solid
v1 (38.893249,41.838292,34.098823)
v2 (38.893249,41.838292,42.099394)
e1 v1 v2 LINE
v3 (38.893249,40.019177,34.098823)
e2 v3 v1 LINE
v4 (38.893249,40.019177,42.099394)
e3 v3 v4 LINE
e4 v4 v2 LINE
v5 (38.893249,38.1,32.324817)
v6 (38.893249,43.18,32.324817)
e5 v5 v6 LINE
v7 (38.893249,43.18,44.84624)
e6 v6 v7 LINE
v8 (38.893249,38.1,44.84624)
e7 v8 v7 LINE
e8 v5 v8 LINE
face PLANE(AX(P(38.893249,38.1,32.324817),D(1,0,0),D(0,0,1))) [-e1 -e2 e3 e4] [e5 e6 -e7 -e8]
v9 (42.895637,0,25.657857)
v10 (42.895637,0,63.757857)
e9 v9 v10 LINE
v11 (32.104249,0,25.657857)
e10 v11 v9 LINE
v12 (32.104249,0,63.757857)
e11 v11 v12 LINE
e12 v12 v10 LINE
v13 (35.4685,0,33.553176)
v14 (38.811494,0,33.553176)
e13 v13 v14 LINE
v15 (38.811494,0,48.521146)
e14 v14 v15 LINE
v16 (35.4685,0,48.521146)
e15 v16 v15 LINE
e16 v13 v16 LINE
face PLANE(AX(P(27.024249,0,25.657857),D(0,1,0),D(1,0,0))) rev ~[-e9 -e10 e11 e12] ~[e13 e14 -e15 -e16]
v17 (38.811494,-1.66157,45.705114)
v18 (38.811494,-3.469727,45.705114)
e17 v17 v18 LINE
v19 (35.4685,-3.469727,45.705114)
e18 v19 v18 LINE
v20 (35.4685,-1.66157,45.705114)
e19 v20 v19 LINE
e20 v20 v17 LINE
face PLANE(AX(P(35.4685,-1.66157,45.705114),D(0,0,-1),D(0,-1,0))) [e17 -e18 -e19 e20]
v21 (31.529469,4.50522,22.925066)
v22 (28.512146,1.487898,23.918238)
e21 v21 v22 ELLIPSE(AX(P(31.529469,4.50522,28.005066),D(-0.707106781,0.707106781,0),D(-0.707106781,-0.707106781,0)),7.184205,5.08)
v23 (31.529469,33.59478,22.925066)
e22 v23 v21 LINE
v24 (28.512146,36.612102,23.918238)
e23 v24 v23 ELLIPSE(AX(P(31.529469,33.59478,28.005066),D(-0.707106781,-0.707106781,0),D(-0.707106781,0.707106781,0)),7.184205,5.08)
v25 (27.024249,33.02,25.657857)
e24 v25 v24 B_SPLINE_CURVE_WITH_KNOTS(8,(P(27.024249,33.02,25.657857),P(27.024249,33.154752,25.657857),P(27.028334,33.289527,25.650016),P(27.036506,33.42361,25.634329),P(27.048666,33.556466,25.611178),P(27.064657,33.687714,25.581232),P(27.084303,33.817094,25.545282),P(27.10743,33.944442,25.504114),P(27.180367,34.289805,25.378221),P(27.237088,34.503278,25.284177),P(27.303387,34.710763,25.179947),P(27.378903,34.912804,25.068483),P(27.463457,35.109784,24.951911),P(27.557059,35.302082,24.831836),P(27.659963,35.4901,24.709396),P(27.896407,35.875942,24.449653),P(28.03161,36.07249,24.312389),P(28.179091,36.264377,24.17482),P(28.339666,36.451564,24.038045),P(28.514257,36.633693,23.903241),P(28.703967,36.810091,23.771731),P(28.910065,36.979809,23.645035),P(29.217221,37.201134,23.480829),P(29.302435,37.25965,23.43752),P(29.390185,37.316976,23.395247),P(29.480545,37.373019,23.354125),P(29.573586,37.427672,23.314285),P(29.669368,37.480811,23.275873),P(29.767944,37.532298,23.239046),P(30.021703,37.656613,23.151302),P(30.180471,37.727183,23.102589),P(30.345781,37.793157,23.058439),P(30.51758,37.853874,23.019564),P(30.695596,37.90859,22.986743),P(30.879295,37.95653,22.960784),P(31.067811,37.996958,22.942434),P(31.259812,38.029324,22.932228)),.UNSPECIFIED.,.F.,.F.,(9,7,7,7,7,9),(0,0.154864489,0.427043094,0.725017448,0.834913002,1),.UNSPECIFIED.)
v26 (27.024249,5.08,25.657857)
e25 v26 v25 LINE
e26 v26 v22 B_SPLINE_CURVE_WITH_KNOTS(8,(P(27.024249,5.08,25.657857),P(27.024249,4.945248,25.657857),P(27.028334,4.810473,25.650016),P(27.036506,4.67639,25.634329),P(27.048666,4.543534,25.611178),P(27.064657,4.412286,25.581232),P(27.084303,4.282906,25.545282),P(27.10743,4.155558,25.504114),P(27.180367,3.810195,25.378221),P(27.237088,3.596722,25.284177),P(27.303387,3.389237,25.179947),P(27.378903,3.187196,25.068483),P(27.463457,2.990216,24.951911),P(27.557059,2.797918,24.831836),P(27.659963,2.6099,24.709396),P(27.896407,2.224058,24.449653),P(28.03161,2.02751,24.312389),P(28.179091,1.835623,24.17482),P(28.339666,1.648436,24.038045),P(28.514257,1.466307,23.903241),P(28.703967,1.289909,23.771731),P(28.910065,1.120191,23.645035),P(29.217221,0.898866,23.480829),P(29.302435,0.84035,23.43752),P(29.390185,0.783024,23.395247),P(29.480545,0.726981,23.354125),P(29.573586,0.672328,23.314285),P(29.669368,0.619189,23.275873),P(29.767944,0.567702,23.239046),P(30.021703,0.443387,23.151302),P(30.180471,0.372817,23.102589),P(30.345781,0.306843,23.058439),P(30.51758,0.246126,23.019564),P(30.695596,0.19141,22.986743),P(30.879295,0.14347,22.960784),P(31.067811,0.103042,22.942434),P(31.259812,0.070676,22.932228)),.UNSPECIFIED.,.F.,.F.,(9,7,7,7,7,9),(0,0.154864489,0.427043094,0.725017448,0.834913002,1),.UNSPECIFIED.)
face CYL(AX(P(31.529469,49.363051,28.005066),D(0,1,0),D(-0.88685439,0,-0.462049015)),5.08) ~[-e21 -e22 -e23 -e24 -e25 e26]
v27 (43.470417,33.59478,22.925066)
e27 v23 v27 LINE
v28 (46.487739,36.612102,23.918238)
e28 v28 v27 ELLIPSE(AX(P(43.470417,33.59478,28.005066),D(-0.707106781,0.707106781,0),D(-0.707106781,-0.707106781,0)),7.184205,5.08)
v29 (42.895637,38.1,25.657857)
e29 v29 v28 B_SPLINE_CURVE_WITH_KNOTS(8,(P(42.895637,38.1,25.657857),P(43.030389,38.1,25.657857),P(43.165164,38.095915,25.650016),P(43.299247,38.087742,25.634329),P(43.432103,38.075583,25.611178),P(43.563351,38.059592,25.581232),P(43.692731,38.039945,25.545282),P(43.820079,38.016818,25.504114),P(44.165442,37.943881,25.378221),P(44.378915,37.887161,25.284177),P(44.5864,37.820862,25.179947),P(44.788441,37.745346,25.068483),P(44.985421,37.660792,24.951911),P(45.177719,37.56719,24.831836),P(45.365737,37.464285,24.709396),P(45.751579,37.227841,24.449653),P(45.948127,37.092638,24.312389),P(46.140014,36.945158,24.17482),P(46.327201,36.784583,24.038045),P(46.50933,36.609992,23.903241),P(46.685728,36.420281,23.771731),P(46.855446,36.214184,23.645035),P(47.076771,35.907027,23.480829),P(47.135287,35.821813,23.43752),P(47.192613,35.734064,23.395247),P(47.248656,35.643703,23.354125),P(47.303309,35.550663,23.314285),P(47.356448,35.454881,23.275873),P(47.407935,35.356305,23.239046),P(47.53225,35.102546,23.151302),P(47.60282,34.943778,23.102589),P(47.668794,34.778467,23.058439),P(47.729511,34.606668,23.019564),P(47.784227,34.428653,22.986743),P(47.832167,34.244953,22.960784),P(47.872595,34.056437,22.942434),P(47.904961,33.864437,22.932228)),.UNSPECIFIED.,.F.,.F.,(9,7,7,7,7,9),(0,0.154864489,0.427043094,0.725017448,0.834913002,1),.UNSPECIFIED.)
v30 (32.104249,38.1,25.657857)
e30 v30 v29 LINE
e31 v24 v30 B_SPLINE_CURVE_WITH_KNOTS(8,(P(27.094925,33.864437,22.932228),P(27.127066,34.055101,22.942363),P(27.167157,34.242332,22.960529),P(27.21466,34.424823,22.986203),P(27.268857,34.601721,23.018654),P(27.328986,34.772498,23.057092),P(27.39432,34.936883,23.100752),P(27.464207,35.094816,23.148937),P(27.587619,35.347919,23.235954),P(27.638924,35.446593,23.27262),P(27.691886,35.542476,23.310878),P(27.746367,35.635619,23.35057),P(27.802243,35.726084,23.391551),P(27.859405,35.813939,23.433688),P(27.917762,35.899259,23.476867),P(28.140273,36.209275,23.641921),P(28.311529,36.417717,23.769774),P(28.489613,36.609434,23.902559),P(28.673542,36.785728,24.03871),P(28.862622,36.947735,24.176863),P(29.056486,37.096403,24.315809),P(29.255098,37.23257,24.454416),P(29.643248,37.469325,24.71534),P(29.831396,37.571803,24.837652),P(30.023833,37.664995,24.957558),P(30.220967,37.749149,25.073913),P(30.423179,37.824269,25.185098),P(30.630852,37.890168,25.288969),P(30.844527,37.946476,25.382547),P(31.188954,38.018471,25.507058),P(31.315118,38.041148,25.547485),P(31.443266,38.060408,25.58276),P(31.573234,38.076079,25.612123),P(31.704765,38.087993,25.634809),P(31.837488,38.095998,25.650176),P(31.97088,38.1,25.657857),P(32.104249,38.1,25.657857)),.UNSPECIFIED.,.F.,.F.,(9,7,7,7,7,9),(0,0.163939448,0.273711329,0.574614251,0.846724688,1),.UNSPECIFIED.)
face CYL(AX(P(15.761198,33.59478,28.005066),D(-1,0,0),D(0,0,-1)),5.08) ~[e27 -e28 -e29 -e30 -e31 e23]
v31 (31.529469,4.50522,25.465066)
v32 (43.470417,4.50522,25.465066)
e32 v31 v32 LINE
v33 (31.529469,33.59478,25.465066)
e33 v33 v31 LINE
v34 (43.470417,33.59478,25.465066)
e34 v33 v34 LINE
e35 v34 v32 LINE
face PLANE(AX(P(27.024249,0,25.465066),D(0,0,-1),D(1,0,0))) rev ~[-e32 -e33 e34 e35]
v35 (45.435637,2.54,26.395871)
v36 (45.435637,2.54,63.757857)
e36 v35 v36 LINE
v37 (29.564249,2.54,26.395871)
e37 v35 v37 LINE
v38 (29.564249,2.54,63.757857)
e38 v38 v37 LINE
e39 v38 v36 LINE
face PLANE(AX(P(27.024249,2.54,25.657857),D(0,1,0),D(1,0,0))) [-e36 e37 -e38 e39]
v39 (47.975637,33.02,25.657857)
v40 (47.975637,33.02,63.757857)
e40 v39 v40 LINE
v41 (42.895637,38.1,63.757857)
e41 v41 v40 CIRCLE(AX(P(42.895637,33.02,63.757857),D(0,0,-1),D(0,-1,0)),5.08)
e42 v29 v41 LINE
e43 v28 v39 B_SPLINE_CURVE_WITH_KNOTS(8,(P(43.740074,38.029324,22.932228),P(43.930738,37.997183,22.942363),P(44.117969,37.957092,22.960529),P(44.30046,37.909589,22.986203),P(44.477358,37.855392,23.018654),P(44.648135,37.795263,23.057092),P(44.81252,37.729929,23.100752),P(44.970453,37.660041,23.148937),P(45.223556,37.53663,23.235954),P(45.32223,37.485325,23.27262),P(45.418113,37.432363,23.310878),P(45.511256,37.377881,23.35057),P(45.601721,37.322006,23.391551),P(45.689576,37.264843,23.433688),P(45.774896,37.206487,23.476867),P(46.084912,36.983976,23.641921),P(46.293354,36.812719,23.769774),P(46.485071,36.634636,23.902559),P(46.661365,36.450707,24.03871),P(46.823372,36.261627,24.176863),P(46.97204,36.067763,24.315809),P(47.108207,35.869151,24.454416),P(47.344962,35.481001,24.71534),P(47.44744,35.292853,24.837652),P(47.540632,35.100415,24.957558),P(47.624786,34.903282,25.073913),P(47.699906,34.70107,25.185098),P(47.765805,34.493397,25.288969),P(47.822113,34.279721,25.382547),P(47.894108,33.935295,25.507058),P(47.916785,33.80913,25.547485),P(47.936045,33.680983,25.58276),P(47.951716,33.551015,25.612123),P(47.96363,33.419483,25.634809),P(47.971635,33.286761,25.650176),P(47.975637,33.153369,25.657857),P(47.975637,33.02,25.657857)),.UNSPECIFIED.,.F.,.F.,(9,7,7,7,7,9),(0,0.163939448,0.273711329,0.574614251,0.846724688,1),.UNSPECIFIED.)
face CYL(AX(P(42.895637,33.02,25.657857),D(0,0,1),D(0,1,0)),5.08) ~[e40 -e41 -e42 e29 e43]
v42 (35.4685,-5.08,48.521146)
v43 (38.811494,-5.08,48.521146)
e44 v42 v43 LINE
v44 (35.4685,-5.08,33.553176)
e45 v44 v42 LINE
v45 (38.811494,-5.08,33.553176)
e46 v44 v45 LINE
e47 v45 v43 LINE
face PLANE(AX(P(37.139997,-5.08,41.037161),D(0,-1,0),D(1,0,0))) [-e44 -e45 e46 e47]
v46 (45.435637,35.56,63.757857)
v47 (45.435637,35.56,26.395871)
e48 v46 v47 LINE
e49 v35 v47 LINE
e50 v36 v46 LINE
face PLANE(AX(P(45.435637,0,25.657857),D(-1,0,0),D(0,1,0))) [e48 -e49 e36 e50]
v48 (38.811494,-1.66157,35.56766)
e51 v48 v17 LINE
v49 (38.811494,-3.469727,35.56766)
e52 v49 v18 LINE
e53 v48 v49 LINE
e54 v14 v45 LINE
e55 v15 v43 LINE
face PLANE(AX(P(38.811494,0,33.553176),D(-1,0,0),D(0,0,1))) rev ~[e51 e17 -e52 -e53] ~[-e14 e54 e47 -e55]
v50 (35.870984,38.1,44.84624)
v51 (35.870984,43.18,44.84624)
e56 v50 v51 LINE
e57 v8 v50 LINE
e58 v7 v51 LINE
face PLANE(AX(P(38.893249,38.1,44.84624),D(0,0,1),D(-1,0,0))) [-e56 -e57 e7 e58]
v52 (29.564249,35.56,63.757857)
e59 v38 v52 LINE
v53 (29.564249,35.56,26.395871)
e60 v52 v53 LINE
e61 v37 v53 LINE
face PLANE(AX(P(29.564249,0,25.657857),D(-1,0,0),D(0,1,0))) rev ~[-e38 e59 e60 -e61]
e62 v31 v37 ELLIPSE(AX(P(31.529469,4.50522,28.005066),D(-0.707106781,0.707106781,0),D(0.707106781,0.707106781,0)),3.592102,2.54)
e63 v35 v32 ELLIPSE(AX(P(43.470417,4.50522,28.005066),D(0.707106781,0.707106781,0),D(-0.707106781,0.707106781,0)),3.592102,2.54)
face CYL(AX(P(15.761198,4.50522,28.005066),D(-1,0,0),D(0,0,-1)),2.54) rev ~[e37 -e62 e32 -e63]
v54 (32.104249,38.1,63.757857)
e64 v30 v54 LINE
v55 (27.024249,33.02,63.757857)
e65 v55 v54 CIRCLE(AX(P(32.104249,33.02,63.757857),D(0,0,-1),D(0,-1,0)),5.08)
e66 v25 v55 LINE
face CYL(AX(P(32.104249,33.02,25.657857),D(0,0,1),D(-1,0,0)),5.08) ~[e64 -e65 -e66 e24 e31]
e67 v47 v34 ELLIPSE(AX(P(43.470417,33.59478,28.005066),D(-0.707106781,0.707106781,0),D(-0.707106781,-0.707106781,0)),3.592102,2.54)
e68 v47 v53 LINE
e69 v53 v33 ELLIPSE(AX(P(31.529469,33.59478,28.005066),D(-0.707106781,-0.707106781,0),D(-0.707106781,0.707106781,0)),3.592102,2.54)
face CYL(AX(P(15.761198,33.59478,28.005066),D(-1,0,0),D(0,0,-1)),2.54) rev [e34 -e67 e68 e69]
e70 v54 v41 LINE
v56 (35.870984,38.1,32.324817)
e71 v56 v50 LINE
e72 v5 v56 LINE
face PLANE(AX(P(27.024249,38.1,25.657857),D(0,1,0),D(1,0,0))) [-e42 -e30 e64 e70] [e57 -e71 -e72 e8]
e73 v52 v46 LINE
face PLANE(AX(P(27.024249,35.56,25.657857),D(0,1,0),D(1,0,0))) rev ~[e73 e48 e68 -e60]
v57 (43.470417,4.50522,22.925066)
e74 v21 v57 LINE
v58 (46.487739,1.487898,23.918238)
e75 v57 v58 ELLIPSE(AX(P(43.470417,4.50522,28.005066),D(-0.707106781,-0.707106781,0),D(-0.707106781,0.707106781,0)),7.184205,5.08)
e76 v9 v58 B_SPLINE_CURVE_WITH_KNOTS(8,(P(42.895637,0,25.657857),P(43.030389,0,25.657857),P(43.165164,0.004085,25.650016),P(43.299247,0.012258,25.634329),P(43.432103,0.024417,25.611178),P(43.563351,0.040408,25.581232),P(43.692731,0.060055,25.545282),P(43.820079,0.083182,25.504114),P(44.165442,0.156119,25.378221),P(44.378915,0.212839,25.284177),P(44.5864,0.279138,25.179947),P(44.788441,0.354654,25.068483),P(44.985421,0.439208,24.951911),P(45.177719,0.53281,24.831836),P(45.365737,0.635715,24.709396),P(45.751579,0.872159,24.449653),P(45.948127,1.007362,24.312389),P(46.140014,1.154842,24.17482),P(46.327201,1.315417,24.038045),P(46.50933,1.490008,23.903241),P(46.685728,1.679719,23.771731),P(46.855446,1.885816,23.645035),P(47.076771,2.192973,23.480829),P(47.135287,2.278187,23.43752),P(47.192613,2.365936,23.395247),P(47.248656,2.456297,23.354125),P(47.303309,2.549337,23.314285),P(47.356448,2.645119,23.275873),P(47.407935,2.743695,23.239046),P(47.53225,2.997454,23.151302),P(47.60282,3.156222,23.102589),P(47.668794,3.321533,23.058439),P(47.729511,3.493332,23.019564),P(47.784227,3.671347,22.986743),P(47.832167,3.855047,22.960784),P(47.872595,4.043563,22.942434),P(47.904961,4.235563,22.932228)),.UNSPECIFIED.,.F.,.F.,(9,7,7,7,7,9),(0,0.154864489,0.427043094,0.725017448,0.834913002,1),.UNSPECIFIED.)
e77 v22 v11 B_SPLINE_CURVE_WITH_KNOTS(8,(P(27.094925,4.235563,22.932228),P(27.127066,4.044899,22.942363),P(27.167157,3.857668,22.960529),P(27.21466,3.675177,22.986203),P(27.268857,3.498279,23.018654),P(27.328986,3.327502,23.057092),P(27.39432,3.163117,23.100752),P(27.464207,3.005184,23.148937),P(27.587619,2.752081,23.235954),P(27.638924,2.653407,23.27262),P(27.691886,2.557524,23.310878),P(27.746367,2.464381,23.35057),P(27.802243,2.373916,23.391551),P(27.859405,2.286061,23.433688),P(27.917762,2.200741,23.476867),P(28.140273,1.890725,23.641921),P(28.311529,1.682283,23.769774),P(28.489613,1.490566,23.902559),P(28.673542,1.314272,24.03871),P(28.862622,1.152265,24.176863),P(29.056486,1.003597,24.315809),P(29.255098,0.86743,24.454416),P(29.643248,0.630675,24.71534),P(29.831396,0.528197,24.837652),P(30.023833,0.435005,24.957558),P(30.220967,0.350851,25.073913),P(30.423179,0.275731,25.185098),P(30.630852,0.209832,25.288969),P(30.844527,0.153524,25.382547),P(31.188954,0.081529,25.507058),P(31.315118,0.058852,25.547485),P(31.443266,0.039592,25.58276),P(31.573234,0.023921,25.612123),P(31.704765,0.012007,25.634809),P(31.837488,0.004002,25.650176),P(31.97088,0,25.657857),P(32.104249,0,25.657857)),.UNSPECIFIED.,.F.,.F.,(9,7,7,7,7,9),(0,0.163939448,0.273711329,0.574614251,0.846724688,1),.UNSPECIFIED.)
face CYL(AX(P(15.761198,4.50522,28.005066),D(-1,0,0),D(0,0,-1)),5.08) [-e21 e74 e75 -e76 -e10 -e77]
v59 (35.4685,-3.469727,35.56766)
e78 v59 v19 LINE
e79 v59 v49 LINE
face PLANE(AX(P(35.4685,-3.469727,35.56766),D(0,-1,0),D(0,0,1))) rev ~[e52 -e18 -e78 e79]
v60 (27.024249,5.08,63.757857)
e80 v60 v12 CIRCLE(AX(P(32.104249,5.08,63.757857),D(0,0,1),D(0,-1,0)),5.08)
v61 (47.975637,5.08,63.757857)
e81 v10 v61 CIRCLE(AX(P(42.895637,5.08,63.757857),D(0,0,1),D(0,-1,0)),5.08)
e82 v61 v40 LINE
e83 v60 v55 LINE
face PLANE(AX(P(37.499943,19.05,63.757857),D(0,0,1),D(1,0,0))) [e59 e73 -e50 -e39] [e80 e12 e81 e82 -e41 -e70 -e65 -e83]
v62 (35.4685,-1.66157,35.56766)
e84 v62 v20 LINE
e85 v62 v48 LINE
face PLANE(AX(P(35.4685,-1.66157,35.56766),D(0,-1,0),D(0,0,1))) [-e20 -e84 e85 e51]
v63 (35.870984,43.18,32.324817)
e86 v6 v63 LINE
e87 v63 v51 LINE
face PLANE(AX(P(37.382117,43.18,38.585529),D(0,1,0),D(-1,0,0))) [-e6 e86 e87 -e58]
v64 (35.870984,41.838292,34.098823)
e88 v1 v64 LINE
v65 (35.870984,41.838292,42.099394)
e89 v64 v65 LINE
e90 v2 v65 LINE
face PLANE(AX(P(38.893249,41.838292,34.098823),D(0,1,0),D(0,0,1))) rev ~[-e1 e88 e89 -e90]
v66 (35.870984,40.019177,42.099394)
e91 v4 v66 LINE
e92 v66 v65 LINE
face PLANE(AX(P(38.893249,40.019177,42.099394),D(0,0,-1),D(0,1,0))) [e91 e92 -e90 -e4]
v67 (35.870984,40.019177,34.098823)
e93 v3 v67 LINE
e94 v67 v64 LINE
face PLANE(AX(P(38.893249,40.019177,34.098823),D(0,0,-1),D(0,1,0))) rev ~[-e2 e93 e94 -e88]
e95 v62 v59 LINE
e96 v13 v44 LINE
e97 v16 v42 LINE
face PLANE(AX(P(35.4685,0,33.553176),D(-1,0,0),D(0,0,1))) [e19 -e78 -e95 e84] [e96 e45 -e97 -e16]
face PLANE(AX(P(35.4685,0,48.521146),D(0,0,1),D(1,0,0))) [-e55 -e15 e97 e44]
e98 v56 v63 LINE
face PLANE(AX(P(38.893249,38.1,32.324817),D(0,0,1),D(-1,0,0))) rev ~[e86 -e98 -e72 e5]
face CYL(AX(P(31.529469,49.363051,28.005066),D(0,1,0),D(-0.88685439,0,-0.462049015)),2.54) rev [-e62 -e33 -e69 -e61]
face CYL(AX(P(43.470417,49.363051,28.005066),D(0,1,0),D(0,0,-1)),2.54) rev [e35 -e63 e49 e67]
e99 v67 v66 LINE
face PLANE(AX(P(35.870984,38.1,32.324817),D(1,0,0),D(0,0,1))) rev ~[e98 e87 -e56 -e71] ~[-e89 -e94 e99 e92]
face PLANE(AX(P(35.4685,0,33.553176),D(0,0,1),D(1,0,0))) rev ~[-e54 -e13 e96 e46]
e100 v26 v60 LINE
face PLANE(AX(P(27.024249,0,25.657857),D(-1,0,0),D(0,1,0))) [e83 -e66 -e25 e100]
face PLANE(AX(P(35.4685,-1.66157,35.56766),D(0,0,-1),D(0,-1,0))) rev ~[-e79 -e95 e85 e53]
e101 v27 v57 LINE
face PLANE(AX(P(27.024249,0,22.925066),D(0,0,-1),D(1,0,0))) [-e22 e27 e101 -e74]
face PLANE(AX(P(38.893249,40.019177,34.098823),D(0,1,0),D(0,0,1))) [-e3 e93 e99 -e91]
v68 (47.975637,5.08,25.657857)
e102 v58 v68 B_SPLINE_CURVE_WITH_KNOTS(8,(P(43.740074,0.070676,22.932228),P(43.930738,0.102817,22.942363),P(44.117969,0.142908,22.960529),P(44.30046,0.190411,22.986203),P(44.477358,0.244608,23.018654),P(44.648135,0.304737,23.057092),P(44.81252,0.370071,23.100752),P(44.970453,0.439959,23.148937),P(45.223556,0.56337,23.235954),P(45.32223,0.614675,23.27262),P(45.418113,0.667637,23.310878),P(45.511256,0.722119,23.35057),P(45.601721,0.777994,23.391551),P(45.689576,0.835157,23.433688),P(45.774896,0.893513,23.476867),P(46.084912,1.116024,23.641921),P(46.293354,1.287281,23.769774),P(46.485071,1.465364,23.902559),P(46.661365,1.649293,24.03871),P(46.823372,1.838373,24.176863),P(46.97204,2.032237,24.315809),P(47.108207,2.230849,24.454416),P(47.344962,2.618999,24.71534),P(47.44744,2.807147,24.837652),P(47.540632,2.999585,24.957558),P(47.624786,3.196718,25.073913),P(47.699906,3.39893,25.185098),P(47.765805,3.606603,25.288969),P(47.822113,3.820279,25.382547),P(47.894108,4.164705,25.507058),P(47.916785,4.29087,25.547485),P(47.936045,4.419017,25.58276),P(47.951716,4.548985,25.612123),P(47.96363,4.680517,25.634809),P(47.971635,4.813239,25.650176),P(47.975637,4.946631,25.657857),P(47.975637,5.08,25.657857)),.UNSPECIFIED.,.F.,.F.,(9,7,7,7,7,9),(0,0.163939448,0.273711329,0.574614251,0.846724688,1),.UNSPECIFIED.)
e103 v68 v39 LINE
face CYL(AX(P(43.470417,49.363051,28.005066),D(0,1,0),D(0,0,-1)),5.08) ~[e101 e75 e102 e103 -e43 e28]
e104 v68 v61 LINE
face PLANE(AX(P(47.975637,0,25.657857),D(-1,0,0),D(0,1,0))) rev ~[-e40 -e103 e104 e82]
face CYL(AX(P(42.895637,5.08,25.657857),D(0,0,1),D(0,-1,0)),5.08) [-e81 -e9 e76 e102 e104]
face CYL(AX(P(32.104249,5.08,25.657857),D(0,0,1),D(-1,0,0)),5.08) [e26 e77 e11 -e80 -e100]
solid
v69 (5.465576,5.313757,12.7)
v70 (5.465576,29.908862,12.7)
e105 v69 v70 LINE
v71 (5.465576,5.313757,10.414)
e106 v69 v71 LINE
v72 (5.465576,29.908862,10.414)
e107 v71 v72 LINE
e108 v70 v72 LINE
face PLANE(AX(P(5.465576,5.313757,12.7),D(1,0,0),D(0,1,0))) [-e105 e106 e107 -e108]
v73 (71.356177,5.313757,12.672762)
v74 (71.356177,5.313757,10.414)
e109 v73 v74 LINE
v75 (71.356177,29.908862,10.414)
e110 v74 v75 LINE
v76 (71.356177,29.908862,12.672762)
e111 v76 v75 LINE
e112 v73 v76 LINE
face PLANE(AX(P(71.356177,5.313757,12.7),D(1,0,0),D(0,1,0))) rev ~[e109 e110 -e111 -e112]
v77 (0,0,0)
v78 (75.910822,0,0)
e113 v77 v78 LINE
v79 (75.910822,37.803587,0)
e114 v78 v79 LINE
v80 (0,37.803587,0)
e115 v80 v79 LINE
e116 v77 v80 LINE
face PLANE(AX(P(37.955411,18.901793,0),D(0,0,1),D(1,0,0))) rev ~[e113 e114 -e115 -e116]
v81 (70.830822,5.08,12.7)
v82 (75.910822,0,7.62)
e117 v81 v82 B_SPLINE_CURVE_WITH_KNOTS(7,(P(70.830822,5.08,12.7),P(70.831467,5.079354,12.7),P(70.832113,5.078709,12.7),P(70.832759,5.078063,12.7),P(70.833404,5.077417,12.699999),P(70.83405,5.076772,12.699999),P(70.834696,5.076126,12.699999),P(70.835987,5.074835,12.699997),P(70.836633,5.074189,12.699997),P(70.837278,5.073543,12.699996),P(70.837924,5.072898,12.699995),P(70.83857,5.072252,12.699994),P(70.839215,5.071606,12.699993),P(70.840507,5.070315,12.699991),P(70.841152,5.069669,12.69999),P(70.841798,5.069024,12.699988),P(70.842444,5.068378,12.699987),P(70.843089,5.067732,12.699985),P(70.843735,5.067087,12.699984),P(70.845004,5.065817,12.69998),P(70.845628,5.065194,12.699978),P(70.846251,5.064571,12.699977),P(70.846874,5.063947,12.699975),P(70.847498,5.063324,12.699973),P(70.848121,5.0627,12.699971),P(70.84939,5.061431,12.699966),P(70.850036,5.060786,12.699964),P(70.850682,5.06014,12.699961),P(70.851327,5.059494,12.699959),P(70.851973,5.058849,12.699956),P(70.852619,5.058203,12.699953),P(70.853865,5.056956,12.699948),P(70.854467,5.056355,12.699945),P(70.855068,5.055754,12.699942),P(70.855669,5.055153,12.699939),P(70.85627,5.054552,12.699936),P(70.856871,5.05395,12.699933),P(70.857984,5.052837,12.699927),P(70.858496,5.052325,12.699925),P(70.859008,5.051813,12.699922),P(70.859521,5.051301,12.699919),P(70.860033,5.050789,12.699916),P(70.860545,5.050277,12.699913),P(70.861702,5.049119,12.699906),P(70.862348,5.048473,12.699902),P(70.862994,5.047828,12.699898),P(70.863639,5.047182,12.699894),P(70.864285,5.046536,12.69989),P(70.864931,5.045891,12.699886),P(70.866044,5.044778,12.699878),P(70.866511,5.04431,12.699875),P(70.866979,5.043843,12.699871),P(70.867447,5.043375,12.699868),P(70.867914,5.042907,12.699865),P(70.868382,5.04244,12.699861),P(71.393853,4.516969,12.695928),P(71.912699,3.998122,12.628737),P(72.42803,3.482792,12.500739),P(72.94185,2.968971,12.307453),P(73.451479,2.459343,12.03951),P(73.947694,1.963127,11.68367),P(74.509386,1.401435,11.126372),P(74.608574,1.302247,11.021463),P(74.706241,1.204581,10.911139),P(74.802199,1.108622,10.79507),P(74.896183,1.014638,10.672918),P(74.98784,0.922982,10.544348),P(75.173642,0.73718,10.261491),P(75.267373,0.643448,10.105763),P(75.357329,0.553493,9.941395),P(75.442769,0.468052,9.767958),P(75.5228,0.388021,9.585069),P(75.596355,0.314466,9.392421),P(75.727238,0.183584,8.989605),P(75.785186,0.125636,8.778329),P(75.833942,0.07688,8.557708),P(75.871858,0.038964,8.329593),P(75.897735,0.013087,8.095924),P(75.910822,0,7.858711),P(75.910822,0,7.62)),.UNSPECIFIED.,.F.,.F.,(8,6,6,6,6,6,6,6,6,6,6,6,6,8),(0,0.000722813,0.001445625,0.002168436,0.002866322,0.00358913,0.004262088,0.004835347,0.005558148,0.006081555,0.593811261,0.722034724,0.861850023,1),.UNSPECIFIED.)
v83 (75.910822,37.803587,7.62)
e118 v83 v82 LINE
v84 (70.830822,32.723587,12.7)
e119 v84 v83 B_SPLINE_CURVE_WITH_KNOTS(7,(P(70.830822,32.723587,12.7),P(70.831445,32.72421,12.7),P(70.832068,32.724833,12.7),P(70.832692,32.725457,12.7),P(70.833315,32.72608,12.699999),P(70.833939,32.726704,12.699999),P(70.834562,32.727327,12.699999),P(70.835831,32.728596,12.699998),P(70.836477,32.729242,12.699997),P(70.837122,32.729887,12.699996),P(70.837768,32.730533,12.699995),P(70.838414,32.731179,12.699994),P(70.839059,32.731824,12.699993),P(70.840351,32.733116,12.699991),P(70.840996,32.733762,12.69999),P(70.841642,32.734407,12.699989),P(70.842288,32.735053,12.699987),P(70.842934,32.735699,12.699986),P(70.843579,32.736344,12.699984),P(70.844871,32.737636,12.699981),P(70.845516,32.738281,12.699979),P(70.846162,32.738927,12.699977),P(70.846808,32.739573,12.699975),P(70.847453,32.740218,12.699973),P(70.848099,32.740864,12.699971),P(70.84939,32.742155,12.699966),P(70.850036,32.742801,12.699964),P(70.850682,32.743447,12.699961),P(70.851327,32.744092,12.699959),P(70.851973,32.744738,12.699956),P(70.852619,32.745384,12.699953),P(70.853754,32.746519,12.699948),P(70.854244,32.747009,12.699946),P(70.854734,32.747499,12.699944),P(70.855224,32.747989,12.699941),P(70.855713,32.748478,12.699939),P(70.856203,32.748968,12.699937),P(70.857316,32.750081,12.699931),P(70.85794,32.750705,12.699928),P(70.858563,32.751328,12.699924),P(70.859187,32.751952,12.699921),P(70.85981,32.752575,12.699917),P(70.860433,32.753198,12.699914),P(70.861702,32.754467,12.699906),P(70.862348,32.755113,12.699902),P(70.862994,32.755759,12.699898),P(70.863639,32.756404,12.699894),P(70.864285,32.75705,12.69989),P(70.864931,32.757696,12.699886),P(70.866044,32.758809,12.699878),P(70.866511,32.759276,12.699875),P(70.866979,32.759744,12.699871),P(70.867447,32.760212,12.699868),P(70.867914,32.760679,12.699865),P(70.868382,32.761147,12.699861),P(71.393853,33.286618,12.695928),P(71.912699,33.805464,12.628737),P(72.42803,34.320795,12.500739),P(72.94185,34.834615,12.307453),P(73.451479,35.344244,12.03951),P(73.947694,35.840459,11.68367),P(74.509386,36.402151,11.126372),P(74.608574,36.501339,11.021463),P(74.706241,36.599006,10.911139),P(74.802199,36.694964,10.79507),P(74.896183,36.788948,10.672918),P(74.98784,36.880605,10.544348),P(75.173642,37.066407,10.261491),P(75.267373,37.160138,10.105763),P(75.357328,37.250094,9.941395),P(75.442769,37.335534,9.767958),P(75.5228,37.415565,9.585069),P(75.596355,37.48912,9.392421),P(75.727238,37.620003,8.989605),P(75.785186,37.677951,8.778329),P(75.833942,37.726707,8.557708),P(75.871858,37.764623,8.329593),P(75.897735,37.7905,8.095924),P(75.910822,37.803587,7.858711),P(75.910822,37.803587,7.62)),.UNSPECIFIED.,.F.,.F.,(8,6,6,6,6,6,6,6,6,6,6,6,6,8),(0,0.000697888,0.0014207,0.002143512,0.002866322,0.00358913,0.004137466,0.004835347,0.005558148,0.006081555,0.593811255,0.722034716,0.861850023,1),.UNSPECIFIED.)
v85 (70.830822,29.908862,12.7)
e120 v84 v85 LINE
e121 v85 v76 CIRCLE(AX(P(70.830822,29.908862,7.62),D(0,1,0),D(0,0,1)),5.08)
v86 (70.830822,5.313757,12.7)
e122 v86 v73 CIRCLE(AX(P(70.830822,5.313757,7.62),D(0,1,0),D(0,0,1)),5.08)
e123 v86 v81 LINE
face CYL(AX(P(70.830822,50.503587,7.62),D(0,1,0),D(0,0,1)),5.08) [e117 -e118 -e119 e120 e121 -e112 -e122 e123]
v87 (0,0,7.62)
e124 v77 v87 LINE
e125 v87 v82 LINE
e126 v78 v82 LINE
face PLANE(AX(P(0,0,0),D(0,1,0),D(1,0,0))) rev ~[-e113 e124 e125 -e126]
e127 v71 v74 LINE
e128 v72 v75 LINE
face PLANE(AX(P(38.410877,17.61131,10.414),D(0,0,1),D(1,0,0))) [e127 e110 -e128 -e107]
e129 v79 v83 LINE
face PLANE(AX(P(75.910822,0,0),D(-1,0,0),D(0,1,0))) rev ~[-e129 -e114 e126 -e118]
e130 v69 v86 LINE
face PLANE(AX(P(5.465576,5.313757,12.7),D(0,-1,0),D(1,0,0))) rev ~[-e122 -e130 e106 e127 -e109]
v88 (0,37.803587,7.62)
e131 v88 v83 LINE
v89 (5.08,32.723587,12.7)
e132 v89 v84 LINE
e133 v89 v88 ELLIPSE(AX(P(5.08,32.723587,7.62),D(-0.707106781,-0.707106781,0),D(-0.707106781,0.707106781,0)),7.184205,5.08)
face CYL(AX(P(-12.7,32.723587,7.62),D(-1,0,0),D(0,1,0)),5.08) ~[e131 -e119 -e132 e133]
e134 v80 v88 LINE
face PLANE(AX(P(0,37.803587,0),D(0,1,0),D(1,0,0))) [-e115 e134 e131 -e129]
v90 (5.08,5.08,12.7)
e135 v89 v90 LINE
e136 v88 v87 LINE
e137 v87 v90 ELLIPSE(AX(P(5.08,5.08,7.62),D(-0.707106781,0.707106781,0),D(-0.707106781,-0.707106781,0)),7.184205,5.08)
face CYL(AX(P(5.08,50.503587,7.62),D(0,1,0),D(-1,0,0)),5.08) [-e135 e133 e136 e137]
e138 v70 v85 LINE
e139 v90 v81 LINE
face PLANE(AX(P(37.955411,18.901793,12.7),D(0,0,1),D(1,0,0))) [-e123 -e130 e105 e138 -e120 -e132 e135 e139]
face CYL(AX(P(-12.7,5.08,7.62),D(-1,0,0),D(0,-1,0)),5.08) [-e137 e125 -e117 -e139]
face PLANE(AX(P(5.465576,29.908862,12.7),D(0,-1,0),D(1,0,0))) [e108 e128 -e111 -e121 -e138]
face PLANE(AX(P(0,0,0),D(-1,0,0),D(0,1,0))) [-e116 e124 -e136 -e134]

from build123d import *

# Parameters (mm, degrees)
F0_W         = 75.910821557
F0_H         = 37.8035865724
F1_DEPTH     = 12.7
F2_W         = 65.8906013705
F2_H         = 24.5951046236
F3_DEPTH     = 2.286
F7_T1_DEPTH  = 101.310821557
F7_T3_DEPTH  = 63.2035865724
F8_W         = 20.9513884038
F8_H         = 2.7327910066
F9_DEPTH     = 38.1
F10_T1_DEPTH = 43.477489898
F10_T3_DEPTH = 60.6261014942
F11_W        = 20.9513884038
F11_H        = 38.1
F12_DEPTH    = 38.1
F13_T        = -2.54
F14_R        = 5.08
F15_R        = 5.08
F16_W        = 3.3429935575
F16_H        = 14.9679705501
F17_DEPTH    = 5.08
F18_W        = 1.8081573071
F18_H        = 10.1374536753
F19_DEPTH    = 5.08
F20_W        = 3.0222646892
F20_H        = 12.5214233994
F21_DEPTH    = 5.08
F22_W        = 1.8191151321
F22_H        = 8.0005712807
F23_DEPTH    = 5.08


# Not quite as in the source:
# - a fillet or chamfer that OpenCascade refuses, or shapes differently, is made with other operations: its cross-section is extruded or revolved along the edge and cut away or added
# - the program builds the solid bodies; features that only make, move or delete a surface that nothing else refers to are left out


with BuildPart() as f1:
    # F0 (on Top) → F1 (new body)
    with BuildSketch(Plane.XY):
        with Locations((37.9554107785, 18.9017932862)):
            Rectangle(F0_W, F0_H)
    extrude(amount=F1_DEPTH)

    # F2 (on face) → F3 (cut)
    with BuildSketch(Plane.XY.offset(12.7)):
        with Locations((38.4108766448, 17.6113096531)):
            Rectangle(F2_W, F2_H)
    extrude(amount=-F3_DEPTH, mode=Mode.SUBTRACT)

    # F7: fillet of radius 5.08 on 4 edges, made by hand

    # F7_s2 → F7_t1 (cut)
    with BuildSketch(Plane.YZ.offset(-12.7)):
        with BuildLine():
            ThreePointArc((0, 7.62), (1.4878975516, 11.2121024484), (5.08, 12.7))
            Line((5.08, 12.7), (0, 12.7))
            Line((0, 12.7), (0, 7.62))
        make_face()
        with BuildLine():
            ThreePointArc((37.8035865724, 7.62), (36.3156890208, 11.2121024484), (32.7235865724, 12.7))
            Line((32.7235865724, 12.7), (37.8035865724, 12.7))
            Line((37.8035865724, 12.7), (37.8035865724, 7.62))
        make_face()
    extrude(amount=F7_T1_DEPTH, mode=Mode.SUBTRACT)

    # F7_s4 → F7_t3 (cut)
    with BuildSketch(Plane.XZ.offset(-50.5035865724)):
        with BuildLine():
            ThreePointArc((0, 7.62), (1.4878975516, 11.2121024484), (5.08, 12.7))
            Line((5.08, 12.7), (0, 12.7))
            Line((0, 12.7), (0, 7.62))
        make_face()
        with BuildLine():
            ThreePointArc((70.830821557, 12.7), (74.4229240055, 11.2121024484), (75.910821557, 7.62))
            Line((75.910821557, 7.62), (75.910821557, 12.7))
            Line((75.910821557, 12.7), (70.830821557, 12.7))
        make_face()
    extrude(amount=F7_T3_DEPTH, mode=Mode.SUBTRACT)


with BuildPart() as f9:
    # F8 (on Front) → F9 (new body)
    with BuildSketch(Plane.XZ):
        with Locations((37.4999428168, 24.2914613336)):
            Rectangle(F8_W, F8_H)
    extrude(amount=-F9_DEPTH)

    # F10: fillet of radius 5.08 on 4 edges, made by hand

    # F10_s2 → F10_t1 (cut)
    with BuildSketch(Plane.YZ.offset(15.7611978678)):
        with BuildLine():
            ThreePointArc((4.5052202988, 22.9250658303), (1.8705876572, 23.6616672943), (0, 25.6578568369))
            Line((0, 25.6578568369), (0, 22.9250658303))
            Line((0, 22.9250658303), (4.5052202988, 22.9250658303))
        make_face()
        with BuildLine():
            ThreePointArc((33.5947797012, 22.9250658303), (36.2294123428, 23.6616672943), (38.1, 25.6578568369))
            Line((38.1, 25.6578568369), (38.1, 22.9250658303))
            Line((38.1, 22.9250658303), (33.5947797012, 22.9250658303))
        make_face()
    extrude(amount=F10_T1_DEPTH, mode=Mode.SUBTRACT)

    # F10_s4 → F10_t3 (cut)
    with BuildSketch(Plane.XZ.offset(-49.3630507471)):
        with BuildLine():
            ThreePointArc((43.4704167198, 22.9250658303), (46.1050493615, 23.6616672943), (47.9756370187, 25.6578568369))
            Line((47.9756370187, 25.6578568369), (47.9756370187, 22.9250658303))
            Line((47.9756370187, 22.9250658303), (43.4704167198, 22.9250658303))
        make_face()
        with BuildLine():
            ThreePointArc((27.0242486149, 25.6578568369), (28.8948362721, 23.6616672943), (31.5294689138, 22.9250658303))
            Line((31.5294689138, 22.9250658303), (27.0242486149, 22.9250658303))
            Line((27.0242486149, 22.9250658303), (27.0242486149, 25.6578568369))
        make_face()
    extrude(amount=F10_T3_DEPTH, mode=Mode.SUBTRACT)

    # F11 (on face) → F12 (join)
    with BuildSketch(Plane.XY.offset(25.6578568369)):
        with Locations((37.4999428168, 19.05)):
            Rectangle(F11_W, F11_H)
    extrude(amount=F12_DEPTH)

    # F13
    f13_openings = [f9.faces().sort_by_distance(p)[0] for p in [
        (37.499943, 19.05, 63.757857),
    ]]
    offset(amount=F13_T, openings=f13_openings)

    # F14
    f14_edges = [f9.edges().sort_by_distance(p)[0] for p in [
        (47.975637, 38.1, 44.707857),
        (47.975637, 0, 44.707857),
        (27.024249, 38.1, 44.707857),
    ]]
    fillet(f14_edges, radius=F14_R)

    # F15
    f15_edges = [f9.edges().sort_by_distance(p)[0] for p in [
        (27.024249, 0, 44.707857),
    ]]
    fillet(f15_edges, radius=F15_R)

    # F16 (on face) → F17 (join)
    with BuildSketch(Plane.XZ):
        with Locations((37.1399968863, 41.0371609032)):
            Rectangle(F16_W, F16_H)
    extrude(amount=F17_DEPTH)

    # F18 (on face) → F19 (cut)
    with BuildSketch(Plane(origin=(35.4685001075, 0, 0), x_dir=(0, -1, 0), z_dir=(-1, 0, 0))):
        with Locations((2.5656485814, 40.6363867223)):
            Rectangle(F18_W, F18_H)
    extrude(amount=-F19_DEPTH, mode=Mode.SUBTRACT)

    # F20 (on face) → F21 (join)
    with BuildSketch(Plane(origin=(0, 38.1, 0), x_dir=(-1, 0, 0), z_dir=(0, 1, 0))):
        with Locations((-37.3821165413, 38.5855287313)):
            Rectangle(F20_W, F20_H)
    extrude(amount=F21_DEPTH)

    # F22 (on face) → F23 (cut)
    with BuildSketch(Plane.YZ.offset(38.8932488859)):
        with Locations((40.9287344664, 38.0991082639)):
            Rectangle(F22_W, F22_H)
    extrude(amount=-F23_DEPTH, mode=Mode.SUBTRACT)


solid = Compound([f1.part, f9.part])
